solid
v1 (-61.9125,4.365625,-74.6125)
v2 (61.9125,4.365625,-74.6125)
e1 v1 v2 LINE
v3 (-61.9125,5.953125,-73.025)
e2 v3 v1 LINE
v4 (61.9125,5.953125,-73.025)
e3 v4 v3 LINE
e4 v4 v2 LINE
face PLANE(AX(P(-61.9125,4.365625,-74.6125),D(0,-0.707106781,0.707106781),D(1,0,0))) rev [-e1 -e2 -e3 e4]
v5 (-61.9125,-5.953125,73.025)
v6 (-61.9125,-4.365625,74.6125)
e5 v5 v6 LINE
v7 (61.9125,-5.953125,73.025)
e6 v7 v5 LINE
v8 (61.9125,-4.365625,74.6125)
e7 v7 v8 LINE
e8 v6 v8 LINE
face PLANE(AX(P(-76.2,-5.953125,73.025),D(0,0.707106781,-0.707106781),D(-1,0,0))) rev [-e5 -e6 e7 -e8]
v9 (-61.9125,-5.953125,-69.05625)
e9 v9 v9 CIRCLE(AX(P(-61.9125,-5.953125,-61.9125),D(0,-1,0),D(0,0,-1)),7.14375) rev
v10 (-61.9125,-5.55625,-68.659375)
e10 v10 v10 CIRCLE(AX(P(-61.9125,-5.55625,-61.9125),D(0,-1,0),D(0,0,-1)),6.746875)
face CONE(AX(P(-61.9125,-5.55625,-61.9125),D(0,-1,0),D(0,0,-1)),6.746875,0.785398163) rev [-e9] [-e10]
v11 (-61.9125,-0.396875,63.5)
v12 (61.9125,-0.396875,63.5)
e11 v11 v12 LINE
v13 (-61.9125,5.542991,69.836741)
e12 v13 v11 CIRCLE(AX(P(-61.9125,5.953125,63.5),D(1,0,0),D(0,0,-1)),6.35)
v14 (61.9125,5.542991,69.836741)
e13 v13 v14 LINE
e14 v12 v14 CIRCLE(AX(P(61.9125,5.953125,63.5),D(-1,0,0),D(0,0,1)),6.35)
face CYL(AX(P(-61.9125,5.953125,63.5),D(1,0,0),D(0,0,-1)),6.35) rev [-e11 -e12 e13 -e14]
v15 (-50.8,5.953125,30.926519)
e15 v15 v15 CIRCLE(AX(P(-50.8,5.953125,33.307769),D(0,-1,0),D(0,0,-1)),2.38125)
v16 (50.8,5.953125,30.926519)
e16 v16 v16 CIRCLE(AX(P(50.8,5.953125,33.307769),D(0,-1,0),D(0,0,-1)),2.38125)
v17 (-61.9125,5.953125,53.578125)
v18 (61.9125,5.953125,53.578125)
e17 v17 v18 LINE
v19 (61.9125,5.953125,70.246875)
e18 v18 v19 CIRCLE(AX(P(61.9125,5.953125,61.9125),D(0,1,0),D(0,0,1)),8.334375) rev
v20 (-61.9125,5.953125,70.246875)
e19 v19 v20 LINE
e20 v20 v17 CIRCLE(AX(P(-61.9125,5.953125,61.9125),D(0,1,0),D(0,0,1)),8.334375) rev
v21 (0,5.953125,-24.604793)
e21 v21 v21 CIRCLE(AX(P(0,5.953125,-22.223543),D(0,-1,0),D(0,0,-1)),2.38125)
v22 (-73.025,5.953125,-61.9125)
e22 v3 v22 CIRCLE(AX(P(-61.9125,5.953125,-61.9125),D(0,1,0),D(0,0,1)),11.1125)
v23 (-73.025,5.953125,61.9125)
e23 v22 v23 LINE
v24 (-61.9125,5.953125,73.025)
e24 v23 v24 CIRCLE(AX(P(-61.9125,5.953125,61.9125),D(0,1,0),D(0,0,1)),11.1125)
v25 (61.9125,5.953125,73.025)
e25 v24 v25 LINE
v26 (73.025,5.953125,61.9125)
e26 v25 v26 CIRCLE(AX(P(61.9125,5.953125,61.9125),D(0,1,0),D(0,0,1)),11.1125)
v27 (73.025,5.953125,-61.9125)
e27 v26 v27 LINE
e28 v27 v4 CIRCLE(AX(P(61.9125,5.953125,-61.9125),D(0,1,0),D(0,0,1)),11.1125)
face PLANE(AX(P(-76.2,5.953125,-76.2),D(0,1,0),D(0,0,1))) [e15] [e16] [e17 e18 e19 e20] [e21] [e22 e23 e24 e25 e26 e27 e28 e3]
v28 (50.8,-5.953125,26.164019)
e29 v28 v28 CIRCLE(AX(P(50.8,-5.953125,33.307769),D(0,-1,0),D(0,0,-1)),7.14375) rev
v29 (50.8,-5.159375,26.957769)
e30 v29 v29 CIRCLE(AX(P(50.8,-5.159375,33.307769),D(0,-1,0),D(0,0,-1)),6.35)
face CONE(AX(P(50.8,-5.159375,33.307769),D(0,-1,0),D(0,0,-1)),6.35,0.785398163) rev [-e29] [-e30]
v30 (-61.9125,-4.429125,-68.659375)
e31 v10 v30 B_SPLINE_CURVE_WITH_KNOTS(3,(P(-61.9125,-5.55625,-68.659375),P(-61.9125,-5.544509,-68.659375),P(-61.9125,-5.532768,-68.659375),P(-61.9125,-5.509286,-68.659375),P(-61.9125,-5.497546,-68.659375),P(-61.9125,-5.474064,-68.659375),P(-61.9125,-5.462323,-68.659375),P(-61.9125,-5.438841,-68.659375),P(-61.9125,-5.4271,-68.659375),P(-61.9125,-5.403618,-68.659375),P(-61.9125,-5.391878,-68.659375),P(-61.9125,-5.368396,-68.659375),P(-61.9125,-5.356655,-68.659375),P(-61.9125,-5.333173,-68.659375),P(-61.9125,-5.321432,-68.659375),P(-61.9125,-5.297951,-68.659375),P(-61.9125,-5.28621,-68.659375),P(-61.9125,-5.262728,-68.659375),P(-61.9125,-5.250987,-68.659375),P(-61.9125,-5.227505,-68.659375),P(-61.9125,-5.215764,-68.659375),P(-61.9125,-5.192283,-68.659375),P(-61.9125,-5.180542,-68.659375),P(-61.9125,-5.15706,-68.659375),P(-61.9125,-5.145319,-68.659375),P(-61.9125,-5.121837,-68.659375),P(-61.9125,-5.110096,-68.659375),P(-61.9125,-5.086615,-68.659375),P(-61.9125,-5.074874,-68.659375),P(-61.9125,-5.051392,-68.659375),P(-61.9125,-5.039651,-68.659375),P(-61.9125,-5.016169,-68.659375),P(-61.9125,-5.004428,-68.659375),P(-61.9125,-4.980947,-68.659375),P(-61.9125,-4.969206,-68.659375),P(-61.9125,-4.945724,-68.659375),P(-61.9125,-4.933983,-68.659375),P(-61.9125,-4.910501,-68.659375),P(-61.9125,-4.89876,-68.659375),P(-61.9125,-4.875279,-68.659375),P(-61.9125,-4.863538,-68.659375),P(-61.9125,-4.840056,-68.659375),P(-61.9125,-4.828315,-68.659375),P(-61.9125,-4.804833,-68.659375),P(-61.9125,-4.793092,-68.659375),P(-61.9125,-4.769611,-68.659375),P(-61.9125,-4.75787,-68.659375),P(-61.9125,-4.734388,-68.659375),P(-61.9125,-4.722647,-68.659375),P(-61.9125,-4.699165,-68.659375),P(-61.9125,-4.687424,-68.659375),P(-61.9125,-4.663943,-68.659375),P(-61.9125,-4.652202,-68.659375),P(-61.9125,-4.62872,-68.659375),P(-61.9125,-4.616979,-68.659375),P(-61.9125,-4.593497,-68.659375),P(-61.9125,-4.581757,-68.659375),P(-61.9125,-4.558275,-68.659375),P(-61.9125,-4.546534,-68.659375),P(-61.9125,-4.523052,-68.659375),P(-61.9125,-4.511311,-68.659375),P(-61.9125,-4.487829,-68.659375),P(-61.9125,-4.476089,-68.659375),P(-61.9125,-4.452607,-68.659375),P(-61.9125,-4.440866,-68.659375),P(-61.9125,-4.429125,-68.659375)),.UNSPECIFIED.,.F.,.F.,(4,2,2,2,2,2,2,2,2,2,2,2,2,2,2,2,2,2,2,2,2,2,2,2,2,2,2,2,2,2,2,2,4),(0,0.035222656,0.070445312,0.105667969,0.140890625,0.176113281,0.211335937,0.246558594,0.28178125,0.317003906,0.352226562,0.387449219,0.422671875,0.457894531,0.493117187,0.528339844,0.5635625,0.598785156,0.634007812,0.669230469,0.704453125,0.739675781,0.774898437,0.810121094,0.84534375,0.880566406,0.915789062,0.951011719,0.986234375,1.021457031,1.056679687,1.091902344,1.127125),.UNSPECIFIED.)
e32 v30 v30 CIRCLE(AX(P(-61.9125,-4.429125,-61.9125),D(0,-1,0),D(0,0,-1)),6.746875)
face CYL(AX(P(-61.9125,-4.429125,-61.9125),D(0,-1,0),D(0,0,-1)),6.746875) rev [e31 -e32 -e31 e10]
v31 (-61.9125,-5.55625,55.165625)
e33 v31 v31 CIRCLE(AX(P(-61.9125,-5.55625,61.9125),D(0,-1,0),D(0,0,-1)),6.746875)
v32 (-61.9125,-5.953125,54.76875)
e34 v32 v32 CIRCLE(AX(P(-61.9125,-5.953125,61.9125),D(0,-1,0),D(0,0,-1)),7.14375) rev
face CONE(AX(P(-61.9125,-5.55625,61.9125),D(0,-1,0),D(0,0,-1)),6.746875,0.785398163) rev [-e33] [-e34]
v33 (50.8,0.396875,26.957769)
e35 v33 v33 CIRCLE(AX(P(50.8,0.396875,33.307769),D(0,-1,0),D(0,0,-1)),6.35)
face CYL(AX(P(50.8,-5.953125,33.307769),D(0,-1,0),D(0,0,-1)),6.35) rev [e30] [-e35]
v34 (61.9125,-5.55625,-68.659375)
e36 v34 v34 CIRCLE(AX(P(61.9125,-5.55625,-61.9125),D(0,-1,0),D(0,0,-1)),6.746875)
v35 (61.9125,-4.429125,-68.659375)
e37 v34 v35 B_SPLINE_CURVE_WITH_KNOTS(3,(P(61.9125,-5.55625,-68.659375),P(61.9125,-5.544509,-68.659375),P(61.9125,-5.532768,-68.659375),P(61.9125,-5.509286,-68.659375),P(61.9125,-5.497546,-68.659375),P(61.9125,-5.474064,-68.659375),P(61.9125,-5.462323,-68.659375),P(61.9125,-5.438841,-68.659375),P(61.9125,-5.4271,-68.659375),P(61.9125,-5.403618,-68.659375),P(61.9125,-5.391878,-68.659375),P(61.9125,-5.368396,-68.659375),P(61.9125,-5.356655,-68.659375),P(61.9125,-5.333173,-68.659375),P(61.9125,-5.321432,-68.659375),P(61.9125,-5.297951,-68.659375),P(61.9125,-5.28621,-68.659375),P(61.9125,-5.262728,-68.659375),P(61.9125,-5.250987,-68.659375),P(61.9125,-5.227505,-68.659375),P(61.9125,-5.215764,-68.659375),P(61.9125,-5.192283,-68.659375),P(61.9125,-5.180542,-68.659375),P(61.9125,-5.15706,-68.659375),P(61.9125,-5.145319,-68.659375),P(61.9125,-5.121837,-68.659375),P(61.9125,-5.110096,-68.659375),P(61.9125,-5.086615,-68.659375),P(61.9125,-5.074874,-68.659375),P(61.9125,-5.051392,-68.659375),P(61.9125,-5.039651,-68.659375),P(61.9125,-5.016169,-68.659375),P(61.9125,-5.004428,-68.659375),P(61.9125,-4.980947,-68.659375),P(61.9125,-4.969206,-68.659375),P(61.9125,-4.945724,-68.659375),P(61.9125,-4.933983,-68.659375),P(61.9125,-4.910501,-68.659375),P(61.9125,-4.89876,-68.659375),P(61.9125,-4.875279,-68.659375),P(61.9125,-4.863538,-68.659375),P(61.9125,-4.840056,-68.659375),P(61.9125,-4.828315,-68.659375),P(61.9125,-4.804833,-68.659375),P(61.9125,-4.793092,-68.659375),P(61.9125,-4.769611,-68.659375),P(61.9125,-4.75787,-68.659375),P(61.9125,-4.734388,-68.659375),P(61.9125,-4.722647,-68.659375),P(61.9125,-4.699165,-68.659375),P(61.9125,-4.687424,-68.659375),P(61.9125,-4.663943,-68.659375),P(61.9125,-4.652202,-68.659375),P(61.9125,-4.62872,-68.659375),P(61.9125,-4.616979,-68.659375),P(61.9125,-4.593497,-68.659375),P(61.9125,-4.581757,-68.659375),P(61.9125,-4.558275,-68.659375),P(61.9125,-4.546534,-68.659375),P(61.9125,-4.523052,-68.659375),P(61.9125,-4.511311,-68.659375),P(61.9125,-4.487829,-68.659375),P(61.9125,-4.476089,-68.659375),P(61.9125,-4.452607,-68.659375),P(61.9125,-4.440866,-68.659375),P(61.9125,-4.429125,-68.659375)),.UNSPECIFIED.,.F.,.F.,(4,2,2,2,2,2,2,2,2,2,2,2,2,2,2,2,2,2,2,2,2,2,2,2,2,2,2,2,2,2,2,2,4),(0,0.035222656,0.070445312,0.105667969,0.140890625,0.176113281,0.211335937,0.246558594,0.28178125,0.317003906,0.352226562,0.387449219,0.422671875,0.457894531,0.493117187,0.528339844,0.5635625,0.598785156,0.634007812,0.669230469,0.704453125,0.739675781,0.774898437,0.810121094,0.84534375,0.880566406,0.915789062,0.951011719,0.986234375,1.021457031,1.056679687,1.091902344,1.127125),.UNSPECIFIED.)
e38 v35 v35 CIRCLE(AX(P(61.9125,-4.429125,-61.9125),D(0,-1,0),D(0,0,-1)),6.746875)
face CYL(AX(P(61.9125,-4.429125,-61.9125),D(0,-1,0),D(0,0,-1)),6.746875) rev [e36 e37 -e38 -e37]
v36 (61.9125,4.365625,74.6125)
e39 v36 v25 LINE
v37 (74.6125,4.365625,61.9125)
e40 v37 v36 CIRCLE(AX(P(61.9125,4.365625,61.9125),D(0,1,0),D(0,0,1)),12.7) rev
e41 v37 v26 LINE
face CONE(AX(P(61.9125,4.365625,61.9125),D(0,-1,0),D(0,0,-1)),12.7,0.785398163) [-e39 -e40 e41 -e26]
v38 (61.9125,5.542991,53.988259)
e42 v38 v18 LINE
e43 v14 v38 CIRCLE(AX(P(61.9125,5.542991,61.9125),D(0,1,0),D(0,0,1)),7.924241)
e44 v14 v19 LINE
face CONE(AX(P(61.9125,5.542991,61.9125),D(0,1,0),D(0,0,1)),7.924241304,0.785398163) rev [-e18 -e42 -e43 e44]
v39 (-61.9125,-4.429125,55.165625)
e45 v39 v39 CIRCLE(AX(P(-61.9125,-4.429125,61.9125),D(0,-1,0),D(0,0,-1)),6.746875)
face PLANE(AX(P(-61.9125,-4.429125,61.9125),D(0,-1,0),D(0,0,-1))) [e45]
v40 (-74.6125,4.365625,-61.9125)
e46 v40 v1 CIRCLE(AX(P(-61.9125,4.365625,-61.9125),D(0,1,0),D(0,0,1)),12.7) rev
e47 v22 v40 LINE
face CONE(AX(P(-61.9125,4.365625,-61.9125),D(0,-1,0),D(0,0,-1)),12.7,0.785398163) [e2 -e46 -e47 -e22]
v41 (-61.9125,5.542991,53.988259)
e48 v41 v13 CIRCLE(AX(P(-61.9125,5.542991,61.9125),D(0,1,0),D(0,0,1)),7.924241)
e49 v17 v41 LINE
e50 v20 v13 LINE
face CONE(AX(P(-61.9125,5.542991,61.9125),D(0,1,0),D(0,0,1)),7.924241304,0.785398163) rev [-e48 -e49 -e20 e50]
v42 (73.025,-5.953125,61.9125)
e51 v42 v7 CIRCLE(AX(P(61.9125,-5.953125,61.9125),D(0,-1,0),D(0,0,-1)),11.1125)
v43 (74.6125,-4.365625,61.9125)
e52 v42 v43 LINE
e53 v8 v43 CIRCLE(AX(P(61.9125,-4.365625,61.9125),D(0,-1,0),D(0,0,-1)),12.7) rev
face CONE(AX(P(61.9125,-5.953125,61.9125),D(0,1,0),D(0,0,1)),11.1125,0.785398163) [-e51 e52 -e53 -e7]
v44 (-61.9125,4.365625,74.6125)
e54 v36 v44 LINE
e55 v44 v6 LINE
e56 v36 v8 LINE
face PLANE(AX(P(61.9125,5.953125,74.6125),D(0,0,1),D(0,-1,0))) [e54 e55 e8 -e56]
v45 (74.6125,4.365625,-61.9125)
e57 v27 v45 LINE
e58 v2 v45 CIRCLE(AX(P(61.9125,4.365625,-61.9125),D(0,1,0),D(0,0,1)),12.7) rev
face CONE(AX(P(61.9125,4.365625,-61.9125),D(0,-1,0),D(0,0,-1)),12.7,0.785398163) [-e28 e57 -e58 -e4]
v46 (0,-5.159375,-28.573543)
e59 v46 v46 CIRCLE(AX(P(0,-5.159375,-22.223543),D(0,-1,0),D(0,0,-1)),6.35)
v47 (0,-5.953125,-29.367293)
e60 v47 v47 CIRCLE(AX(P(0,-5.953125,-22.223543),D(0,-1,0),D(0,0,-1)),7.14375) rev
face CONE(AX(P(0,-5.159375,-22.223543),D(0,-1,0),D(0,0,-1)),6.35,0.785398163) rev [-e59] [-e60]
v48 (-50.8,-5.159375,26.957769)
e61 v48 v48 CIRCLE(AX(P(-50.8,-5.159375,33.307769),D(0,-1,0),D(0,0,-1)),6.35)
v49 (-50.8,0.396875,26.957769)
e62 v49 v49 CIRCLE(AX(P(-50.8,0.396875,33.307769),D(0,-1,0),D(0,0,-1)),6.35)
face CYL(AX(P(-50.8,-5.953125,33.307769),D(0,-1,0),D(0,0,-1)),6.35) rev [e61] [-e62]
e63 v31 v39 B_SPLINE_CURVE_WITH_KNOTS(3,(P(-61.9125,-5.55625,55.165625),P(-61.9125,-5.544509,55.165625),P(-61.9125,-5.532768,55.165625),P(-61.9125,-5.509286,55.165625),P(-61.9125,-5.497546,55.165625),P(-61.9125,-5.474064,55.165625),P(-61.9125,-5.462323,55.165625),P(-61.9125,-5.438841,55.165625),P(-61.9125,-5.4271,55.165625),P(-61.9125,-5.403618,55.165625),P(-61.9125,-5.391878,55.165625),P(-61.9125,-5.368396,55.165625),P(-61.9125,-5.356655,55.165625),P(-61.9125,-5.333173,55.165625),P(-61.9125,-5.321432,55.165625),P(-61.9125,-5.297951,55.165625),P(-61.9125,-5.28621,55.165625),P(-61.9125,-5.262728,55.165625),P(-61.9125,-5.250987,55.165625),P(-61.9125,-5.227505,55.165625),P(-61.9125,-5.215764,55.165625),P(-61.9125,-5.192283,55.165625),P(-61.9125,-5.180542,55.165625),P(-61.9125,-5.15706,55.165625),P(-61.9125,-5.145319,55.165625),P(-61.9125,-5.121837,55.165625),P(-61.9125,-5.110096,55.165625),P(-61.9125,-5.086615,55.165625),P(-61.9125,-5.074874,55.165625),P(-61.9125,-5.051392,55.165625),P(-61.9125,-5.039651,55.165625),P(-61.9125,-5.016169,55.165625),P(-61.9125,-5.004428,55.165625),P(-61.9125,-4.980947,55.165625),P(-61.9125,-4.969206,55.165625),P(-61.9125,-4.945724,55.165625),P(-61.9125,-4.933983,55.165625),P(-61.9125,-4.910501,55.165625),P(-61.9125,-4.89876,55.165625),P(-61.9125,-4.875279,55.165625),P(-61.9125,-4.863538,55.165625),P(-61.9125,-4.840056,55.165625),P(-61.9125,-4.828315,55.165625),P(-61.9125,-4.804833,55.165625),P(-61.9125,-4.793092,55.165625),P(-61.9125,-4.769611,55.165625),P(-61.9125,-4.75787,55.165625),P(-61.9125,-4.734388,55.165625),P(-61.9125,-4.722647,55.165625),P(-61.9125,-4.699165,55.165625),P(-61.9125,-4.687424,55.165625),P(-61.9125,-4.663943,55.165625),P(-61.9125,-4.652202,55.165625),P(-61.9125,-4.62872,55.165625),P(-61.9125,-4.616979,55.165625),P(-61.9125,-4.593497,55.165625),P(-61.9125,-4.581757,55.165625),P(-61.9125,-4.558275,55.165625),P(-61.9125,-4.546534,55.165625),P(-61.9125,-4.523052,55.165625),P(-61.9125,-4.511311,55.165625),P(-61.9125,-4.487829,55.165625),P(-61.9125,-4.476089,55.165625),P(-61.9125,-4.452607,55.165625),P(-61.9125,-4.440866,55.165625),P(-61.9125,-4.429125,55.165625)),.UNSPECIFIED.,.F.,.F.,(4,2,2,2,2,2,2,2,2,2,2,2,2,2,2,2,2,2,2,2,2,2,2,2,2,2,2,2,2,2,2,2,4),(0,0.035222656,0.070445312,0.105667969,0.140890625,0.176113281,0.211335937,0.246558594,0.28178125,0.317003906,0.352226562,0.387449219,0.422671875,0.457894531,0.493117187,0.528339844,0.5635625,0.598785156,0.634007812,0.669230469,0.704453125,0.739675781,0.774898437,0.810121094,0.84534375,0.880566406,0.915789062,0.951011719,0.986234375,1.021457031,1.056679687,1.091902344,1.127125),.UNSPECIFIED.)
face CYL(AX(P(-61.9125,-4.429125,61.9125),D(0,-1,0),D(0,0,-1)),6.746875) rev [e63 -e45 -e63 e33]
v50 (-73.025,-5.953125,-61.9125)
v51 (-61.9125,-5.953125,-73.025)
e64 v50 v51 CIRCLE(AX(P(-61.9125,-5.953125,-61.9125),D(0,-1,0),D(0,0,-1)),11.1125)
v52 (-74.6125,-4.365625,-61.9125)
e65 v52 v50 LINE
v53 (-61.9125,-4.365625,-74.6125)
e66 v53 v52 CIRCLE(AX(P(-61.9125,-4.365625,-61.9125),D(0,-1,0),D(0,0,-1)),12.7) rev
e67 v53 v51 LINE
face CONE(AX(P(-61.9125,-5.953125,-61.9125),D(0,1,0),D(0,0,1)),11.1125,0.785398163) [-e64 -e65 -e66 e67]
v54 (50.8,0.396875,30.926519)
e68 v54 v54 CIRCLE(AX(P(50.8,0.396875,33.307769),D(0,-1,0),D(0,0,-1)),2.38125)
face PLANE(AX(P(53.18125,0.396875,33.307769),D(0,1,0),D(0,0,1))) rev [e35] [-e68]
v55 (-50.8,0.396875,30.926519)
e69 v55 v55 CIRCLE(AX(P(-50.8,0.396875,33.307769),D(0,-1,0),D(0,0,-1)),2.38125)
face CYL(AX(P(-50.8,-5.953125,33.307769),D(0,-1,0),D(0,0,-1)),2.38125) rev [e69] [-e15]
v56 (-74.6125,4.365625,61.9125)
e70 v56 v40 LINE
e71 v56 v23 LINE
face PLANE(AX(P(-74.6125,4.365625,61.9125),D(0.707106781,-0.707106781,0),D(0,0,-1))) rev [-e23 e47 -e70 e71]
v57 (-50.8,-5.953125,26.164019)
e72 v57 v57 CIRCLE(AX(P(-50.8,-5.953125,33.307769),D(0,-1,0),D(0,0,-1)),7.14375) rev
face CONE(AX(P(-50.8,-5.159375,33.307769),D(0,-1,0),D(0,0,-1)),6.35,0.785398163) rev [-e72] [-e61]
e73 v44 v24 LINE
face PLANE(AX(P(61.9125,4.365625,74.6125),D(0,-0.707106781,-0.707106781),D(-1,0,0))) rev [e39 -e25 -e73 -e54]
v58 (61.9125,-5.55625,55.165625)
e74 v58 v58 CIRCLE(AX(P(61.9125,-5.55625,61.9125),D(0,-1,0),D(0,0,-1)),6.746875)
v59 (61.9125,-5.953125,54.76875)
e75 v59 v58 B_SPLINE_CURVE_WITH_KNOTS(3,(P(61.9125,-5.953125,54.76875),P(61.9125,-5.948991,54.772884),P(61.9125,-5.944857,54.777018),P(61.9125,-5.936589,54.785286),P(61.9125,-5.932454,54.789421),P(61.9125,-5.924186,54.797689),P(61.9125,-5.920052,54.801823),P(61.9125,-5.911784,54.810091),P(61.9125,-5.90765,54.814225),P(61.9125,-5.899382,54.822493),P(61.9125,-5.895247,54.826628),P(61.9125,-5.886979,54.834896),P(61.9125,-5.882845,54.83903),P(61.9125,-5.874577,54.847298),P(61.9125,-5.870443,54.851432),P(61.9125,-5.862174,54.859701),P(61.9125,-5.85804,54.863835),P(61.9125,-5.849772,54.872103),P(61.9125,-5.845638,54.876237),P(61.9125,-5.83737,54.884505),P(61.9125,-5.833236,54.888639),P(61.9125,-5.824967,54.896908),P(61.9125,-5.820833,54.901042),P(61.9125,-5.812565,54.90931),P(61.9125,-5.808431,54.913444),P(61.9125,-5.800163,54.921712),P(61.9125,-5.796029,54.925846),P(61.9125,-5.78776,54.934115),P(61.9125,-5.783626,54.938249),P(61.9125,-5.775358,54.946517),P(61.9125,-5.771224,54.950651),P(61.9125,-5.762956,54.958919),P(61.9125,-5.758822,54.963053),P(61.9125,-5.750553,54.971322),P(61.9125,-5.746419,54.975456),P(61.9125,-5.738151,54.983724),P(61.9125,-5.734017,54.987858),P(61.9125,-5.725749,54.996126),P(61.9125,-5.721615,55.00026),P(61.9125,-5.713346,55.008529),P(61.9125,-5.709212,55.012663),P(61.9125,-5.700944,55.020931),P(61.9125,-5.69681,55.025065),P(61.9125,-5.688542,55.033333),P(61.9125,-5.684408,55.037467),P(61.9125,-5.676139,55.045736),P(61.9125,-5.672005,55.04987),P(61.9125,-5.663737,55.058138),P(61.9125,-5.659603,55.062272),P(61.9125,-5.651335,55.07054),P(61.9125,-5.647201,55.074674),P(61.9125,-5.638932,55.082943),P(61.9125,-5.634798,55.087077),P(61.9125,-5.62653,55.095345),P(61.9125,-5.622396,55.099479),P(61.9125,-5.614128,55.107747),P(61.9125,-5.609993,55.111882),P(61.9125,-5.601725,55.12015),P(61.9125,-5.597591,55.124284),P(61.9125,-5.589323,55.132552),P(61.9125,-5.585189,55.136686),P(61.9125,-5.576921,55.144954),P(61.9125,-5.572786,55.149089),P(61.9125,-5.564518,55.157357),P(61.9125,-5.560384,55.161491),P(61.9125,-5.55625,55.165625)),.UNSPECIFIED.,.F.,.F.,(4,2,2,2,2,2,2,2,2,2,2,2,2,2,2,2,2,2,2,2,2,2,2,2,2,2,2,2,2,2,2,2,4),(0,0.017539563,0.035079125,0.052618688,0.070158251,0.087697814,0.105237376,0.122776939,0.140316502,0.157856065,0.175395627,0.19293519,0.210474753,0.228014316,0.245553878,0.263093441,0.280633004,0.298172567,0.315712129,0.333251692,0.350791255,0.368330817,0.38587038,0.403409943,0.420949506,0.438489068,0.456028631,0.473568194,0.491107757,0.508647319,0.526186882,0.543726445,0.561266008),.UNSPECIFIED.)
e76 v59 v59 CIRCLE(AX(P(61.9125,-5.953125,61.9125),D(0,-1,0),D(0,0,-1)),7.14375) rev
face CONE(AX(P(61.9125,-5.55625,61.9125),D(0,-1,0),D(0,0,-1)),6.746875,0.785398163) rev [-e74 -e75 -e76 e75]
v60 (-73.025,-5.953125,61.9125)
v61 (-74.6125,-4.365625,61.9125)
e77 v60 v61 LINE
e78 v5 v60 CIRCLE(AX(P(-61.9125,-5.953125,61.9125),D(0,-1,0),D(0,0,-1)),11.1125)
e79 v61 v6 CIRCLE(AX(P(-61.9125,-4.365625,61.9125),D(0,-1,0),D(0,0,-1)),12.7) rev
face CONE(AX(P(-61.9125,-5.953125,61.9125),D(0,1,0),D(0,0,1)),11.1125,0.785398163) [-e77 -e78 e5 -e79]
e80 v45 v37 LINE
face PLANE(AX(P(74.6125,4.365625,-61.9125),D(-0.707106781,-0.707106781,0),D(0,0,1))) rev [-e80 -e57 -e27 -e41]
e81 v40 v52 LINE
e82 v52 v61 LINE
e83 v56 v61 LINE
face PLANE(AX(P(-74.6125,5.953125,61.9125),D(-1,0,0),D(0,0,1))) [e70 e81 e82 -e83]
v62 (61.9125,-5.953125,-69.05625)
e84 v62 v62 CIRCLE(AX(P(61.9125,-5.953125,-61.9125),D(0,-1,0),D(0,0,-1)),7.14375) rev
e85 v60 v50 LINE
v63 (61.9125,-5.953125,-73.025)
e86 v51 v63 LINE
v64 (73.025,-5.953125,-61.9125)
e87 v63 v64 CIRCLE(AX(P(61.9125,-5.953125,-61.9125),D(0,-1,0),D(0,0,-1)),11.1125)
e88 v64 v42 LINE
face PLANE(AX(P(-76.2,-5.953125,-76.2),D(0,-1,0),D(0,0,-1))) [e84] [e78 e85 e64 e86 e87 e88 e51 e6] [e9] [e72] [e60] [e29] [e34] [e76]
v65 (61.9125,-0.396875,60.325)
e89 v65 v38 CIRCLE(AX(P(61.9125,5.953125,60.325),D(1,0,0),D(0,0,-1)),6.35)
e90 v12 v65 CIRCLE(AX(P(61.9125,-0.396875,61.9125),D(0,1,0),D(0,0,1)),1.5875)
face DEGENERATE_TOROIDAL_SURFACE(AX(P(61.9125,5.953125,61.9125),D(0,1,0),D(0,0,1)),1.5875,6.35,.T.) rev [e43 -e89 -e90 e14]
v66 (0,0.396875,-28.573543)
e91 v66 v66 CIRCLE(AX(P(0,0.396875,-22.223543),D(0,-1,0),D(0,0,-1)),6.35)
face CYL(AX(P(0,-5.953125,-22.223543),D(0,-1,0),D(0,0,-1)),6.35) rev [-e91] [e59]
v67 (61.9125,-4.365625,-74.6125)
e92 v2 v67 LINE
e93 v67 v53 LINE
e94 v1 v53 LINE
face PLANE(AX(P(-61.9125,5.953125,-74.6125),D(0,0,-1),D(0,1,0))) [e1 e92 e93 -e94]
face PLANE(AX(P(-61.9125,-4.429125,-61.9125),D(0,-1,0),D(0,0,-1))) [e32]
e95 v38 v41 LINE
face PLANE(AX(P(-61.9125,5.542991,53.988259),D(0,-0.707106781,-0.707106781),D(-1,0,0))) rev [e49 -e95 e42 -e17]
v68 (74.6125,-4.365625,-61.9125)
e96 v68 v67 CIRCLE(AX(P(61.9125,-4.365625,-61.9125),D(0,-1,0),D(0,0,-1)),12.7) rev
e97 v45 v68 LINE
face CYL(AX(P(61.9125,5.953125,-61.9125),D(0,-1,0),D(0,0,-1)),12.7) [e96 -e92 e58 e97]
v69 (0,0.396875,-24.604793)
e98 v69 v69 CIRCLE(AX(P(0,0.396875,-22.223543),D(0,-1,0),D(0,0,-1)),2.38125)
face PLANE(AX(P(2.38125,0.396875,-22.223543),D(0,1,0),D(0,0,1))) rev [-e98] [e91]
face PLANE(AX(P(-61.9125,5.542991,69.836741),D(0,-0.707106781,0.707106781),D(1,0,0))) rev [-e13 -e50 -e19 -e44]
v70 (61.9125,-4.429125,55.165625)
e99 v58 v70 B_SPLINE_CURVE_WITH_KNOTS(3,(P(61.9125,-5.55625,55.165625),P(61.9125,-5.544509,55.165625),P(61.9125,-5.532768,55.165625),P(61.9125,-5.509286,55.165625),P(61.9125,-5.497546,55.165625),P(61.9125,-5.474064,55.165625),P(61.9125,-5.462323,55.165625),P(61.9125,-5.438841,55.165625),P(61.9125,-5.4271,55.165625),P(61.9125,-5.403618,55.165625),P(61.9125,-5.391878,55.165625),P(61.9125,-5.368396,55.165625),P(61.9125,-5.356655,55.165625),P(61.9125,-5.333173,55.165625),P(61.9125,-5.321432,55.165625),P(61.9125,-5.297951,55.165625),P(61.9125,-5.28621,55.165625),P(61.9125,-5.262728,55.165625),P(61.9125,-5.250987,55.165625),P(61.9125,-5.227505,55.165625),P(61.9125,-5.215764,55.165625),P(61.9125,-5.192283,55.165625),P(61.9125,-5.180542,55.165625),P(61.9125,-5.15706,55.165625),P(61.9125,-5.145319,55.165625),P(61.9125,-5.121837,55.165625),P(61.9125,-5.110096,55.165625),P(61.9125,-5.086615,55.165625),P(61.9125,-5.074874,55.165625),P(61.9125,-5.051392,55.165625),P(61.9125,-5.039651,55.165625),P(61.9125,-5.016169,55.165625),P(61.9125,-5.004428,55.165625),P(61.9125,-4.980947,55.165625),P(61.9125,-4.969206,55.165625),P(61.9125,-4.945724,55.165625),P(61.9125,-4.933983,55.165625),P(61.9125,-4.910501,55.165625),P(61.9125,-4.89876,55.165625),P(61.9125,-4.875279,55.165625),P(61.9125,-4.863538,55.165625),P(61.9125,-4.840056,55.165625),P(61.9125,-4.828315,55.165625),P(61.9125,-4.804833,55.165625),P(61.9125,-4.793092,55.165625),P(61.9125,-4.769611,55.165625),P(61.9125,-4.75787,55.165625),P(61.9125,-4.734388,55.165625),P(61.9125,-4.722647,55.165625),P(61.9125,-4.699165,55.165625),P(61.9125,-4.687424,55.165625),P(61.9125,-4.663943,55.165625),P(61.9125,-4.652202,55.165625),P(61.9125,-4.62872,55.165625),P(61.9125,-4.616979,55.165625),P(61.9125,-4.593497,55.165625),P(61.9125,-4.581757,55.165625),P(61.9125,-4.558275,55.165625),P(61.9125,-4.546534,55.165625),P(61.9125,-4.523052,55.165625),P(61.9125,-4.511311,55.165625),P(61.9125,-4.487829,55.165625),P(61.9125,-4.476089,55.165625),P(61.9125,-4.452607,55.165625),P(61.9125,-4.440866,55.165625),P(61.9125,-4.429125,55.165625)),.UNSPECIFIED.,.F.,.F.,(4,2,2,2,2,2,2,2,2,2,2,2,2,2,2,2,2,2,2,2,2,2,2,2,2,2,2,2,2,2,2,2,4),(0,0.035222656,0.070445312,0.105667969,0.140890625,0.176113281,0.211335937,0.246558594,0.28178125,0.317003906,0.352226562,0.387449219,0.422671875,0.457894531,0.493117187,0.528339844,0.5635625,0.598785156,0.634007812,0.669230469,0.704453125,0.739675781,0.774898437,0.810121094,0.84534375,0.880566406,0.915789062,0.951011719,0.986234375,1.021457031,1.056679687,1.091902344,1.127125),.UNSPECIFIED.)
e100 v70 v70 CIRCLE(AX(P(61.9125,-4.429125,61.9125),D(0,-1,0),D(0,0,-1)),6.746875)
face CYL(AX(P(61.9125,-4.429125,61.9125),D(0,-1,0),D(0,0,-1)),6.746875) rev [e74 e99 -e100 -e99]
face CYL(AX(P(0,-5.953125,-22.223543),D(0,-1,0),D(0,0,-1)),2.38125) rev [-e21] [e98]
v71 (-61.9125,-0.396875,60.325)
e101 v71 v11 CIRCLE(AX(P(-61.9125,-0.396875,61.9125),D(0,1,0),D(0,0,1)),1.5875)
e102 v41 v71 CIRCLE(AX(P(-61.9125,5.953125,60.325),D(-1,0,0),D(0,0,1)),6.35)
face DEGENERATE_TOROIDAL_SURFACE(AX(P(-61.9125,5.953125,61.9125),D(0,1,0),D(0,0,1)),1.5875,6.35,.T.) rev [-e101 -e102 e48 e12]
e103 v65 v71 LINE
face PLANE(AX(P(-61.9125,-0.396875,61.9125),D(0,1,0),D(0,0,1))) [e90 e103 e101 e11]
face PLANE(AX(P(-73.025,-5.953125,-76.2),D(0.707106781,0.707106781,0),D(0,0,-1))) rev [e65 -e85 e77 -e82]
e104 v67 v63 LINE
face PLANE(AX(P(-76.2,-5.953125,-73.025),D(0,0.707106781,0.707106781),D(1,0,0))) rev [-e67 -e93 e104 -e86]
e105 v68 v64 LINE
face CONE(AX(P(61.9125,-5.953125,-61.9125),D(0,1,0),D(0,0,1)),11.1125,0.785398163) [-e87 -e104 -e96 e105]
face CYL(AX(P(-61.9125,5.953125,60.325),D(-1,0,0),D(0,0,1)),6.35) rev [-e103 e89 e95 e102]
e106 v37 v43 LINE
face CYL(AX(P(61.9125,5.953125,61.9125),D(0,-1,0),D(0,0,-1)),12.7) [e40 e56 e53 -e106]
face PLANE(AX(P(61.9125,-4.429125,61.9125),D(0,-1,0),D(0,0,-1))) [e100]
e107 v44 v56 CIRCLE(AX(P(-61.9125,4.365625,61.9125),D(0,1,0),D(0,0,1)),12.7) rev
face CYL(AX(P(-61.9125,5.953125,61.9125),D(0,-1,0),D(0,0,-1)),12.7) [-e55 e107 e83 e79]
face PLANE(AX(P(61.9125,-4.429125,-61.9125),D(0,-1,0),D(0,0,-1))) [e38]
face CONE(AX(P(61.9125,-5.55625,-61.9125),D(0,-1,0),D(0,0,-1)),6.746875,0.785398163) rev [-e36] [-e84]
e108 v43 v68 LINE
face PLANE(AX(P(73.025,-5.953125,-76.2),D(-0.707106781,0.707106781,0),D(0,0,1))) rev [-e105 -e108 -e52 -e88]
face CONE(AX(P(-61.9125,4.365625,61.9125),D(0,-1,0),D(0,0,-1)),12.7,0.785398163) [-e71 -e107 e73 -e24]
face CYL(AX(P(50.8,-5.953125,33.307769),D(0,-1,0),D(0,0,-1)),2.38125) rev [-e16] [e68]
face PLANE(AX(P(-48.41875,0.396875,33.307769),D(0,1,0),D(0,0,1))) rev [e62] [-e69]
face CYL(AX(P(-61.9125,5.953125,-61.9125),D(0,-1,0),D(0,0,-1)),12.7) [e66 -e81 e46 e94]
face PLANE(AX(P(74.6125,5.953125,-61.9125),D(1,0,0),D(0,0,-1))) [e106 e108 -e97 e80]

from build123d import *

# Parameters (mm, degrees)
BOSS_EXTRUDE1_DEPTH      = 76.2
BOSS_EXTRUDE1_DEPTH_BACK = 76.2
SKETCH3_W                = 152.4
SKETCH3_H                = 11.90625
SKETCH8_OUTSIDE_W        = 197.57
SKETCH8_OUTSIDE_H        = 197.57
CUT_EXTRUDE2_DEPTH       = 109.41881197
CHAMFER1_SIZE            = 1.5875
PEN_SLOT_CUT_DEPTH       = 6.35
PEN_SLOT_FILLET_R        = 6.35
HOLE1_D                  = 4.7625
HOLE1_CBORE_D            = 12.7
HOLE1_CBORE_DEPTH        = 6.35
SKETCH6_R                = 6.746875
CUT_EXTRUDE1_DEPTH       = 1.524
BASE_CHAMFERS_SIZE       = 0.79375


# Some blends are built 0.0001 mm under size
with BuildPart() as part:
    # Sketch3 → Boss-Extrude1 (new, two sides: drawn at the far end of the back side and taken through both)
    with BuildSketch(Plane(origin=(0, 0, 0), x_dir=(0, 0, -1), z_dir=(1, 0, 0)).offset(-BOSS_EXTRUDE1_DEPTH_BACK)):
        Rectangle(SKETCH3_W, SKETCH3_H)
    extrude(amount=BOSS_EXTRUDE1_DEPTH + BOSS_EXTRUDE1_DEPTH_BACK)

    # Sketch8 outside → Cut-Extrude2 (cut, through all)
    with BuildSketch(Plane.XZ.offset(5.953125)):
        Rectangle(SKETCH8_OUTSIDE_W, SKETCH8_OUTSIDE_H)
        with BuildLine():
            Line((-61.9125, -74.6125), (61.9125, -74.6125))
            ThreePointArc((61.9125, -74.6125), (70.892756121, -70.892756121), (74.6125, -61.9125))
            Line((74.6125, -61.9125), (74.6125, 61.9125))
            ThreePointArc((74.6125, 61.9125), (70.892756121, 70.892756121), (61.9125, 74.6125))
            Line((61.9125, 74.6125), (-61.9125, 74.6125))
            ThreePointArc((-61.9125, 74.6125), (-70.892756121, 70.892756121), (-74.6125, 61.9125))
            Line((-74.6125, 61.9125), (-74.6125, -61.9125))
            ThreePointArc((-74.6125, -61.9125), (-70.892756121, -70.892756121), (-61.9125, -74.6125))
        make_face(mode=Mode.SUBTRACT)
    extrude(amount=-CUT_EXTRUDE2_DEPTH, mode=Mode.SUBTRACT)

    # Chamfer1
    chamfer1_edges = [part.edges().sort_by_distance(p)[0] for p in [
        (-74.6125, 5.953125, 0),
        (-70.892756121, 5.953125, -70.892756121),
        (0, 5.953125, -74.6125),
        (70.892756121, 5.953125, -70.892756121),
        (74.6125, 5.953125, 0),
        (70.892756121, 5.953125, 70.892756121),
        (0, 5.953125, 74.6125),
        (-70.892756121, 5.953125, 70.892756121),
        (-70.892756121, -5.953125, -70.892756121),
        (-74.6125, -5.953125, 0),
        (-70.892756121, -5.953125, 70.892756121),
        (0, -5.953125, 74.6125),
        (70.892756121, -5.953125, 70.892756121),
        (74.6125, -5.953125, 0),
        (70.892756121, -5.953125, -70.892756121),
        (0, -5.953125, -74.6125),
    ]]
    chamfer(chamfer1_edges, length=CHAMFER1_SIZE)

    # Pen Slot Sketch → Pen Slot Cut (cut)
    with BuildSketch(Plane(origin=(0, 5.953125, 0), x_dir=(1, 0, 0), z_dir=(0, 1, 0))):
        with BuildLine():
            Line((-61.9125, -53.975), (61.9125, -53.975))
            ThreePointArc((61.9125, -53.975), (69.85, -61.9125), (61.9125, -69.85))
            Line((61.9125, -69.85), (-61.9125, -69.85))
            ThreePointArc((-61.9125, -69.85), (-69.85, -61.9125), (-61.9125, -53.975))
        make_face()
    extrude(amount=-PEN_SLOT_CUT_DEPTH, mode=Mode.SUBTRACT)

    # Pen Slot Fillet
    pen_slot_fillet_edges = [part.edges().sort_by_distance(p)[0] for p in [
        (0, -0.396875, 53.975),
        (69.85, -0.396875, 61.9125),
        (0, -0.396875, 69.85),
        (-69.85, -0.396875, 61.9125),
    ]]
    fillet(pen_slot_fillet_edges, radius=PEN_SLOT_FILLET_R - 0.0001)  # a hair under: the kernel refuses the full size

    # Hole1 (through all)
    with Locations(Plane(origin=(-50.8, -5.953125, 33.30776944), x_dir=(0, 0, -1), z_dir=(0, -1, 0))):
        with Locations((0, 0), (0, 101.6), (55.531312028, 50.8)):
            CounterBoreHole(HOLE1_D / 2, HOLE1_CBORE_D / 2, HOLE1_CBORE_DEPTH)

    # Sketch6 → Cut-Extrude1 (cut)
    with BuildSketch(Plane(origin=(0, -5.953125, 0), x_dir=(-1, 0, 0), z_dir=(0, -1, 0))):
        with Locations(Location((-61.9125, 61.9125, 0), (0, 0, 90))):
            Circle(SKETCH6_R)
        with Locations(Location((61.9125, 61.9125, 0), (0, 0, 90))):
            Circle(SKETCH6_R)
        with Locations(Location((61.9125, -61.9125, 0), (0, 0, 90))):
            Circle(SKETCH6_R)
        with Locations(Location((-61.9125, -61.9125, 0), (0, 0, 90))):
            Circle(SKETCH6_R)
    extrude(amount=-CUT_EXTRUDE1_DEPTH, mode=Mode.SUBTRACT)

    # Chamfer2
    # the kernel refuses this chamfer: 0.396875 mm, written as the material it takes off along each edge
    with BuildSketch(Plane(origin=(-61.9125, 5.953125, 61.9125), x_dir=(0, 0, 1), z_dir=(1, 0, 0))) as chamfer2_piece_1:
        with BuildLine():
            Line((7.853310099, 0.481064901), (8.418564901, -0.084189901))
            Line((8.418564901, -0.084189901), (8.418564901, -0.143721151))
            ThreePointArc((8.418564901, -0.143721151), (8.178032451, -0.05953125), (7.9375, -0.05953125))
            Line((7.9375, -0.05953125), (7.87796875, 0))
            ThreePointArc((7.87796875, 0), (7.87796875, 0.240532451), (7.793778849, 0.481064901))
            Line((7.793778849, 0.481064901), (7.853310099, 0.481064901))
        make_face()
    revolve(axis=Axis((-61.9125, 5.953125, 61.9125), (0, -1, 0)), revolution_arc=180, mode=Mode.SUBTRACT)
    with BuildSketch(Plane(origin=(61.9125, 5.953125, 69.85), x_dir=(0, 0.17238737169530088, 0.9850292351397425), z_dir=(-1, 0, 0))) as chamfer2_piece_2:
        with BuildLine():
            Line((0.488376267, 0), (-0.165859028, -0.459349716))
            Line((-0.165859028, -0.459349716), (-0.224499049, -0.44908728))
            ThreePointArc((-0.224499049, -0.44908728), (-0.100104779, -0.22666906), (-0.058640022, 0.010262436))
            Line((-0.058640022, 0.010262436), (0.010262436, 0.058640022))
            ThreePointArc((0.010262436, 0.058640022), (0.247193932, 0.017175265), (0.498638703, 0.058640022))
            Line((0.498638703, 0.058640022), (0.488376267, 0))
        make_face()
    extrude(amount=123.825, mode=Mode.SUBTRACT)
    with BuildSketch(Plane(origin=(61.9125, 5.953125, 61.9125), x_dir=(0, 0, -1), z_dir=(-1, 0, 0))) as chamfer2_piece_3:
        with BuildLine():
            Line((8.418564901, -0.084189901), (7.853310099, 0.481064901))
            Line((7.853310099, 0.481064901), (7.793778849, 0.481064901))
            ThreePointArc((7.793778849, 0.481064901), (7.87796875, 0.240532451), (7.87796875, 0))
            Line((7.87796875, 0), (7.9375, -0.05953125))
            ThreePointArc((7.9375, -0.05953125), (8.178032451, -0.05953125), (8.418564901, -0.143721151))
            Line((8.418564901, -0.143721151), (8.418564901, -0.084189901))
        make_face()
    revolve(axis=Axis((61.9125, 5.953125, 61.9125), (0, -1, 0)), revolution_arc=180, mode=Mode.SUBTRACT)
    with BuildSketch(Plane(origin=(-61.9125, 5.953125, 53.975), x_dir=(0, -0.9850292351397427, 0.17238737169529986), z_dir=(1, 0, 0))) as chamfer2_piece_4:
        with BuildLine():
            Line((0.488376267, 0), (-0.165859028, 0.459349716))
            Line((-0.165859028, 0.459349716), (-0.224499049, 0.44908728))
            ThreePointArc((-0.224499049, 0.44908728), (-0.100104779, 0.22666906), (-0.058640022, -0.010262436))
            Line((-0.058640022, -0.010262436), (0.010262436, -0.058640022))
            ThreePointArc((0.010262436, -0.058640022), (0.247193932, -0.017175265), (0.498638703, -0.058640022))
            Line((0.498638703, -0.058640022), (0.488376267, 0))
        make_face()
    extrude(amount=123.825, mode=Mode.SUBTRACT)
    with BuildSketch(Plane(origin=(61.9125, -5.953125, 61.9125), x_dir=(0, 0, -1), z_dir=(-1, 0, 0))) as chamfer2_piece_5:
        with BuildLine():
            Line((7.227939901, 0.084189901), (6.662685099, -0.481064901))
            Line((6.662685099, -0.481064901), (6.603153849, -0.481064901))
            ThreePointArc((6.603153849, -0.481064901), (6.68734375, -0.240532451), (6.68734375, 0))
            Line((6.68734375, 0), (6.746875, 0.05953125))
            ThreePointArc((6.746875, 0.05953125), (6.987407451, 0.05953125), (7.227939901, 0.143721151))
            Line((7.227939901, 0.143721151), (7.227939901, 0.084189901))
        make_face()
    revolve(axis=Axis((61.9125, -5.953125, 61.9125), (0, -1, 0)), mode=Mode.SUBTRACT)
    with BuildSketch(Plane(origin=(-61.9125, -5.953125, 61.9125), x_dir=(0, 0, -1), z_dir=(-1, 0, 0))) as chamfer2_piece_6:
        with BuildLine():
            Line((7.227939901, 0.084189901), (6.662685099, -0.481064901))
            Line((6.662685099, -0.481064901), (6.603153849, -0.481064901))
            ThreePointArc((6.603153849, -0.481064901), (6.68734375, -0.240532451), (6.68734375, 0))
            Line((6.68734375, 0), (6.746875, 0.05953125))
            ThreePointArc((6.746875, 0.05953125), (6.987407451, 0.05953125), (7.227939901, 0.143721151))
            Line((7.227939901, 0.143721151), (7.227939901, 0.084189901))
        make_face()
    revolve(axis=Axis((-61.9125, -5.953125, 61.9125), (0, -1, 0)), mode=Mode.SUBTRACT)
    with BuildSketch(Plane(origin=(-61.9125, -5.953125, -61.9125), x_dir=(0, 0, -1), z_dir=(-1, 0, 0))) as chamfer2_piece_7:
        with BuildLine():
            Line((7.227939901, 0.084189901), (6.662685099, -0.481064901))
            Line((6.662685099, -0.481064901), (6.603153849, -0.481064901))
            ThreePointArc((6.603153849, -0.481064901), (6.68734375, -0.240532451), (6.68734375, 0))
            Line((6.68734375, 0), (6.746875, 0.05953125))
            ThreePointArc((6.746875, 0.05953125), (6.987407451, 0.05953125), (7.227939901, 0.143721151))
            Line((7.227939901, 0.143721151), (7.227939901, 0.084189901))
        make_face()
    revolve(axis=Axis((-61.9125, -5.953125, -61.9125), (0, -1, 0)), mode=Mode.SUBTRACT)
    with BuildSketch(Plane(origin=(61.9125, -5.953125, -61.9125), x_dir=(0, 0, -1), z_dir=(-1, 0, 0))) as chamfer2_piece_8:
        with BuildLine():
            Line((7.227939901, 0.084189901), (6.662685099, -0.481064901))
            Line((6.662685099, -0.481064901), (6.603153849, -0.481064901))
            ThreePointArc((6.603153849, -0.481064901), (6.68734375, -0.240532451), (6.68734375, 0))
            Line((6.68734375, 0), (6.746875, 0.05953125))
            ThreePointArc((6.746875, 0.05953125), (6.987407451, 0.05953125), (7.227939901, 0.143721151))
            Line((7.227939901, 0.143721151), (7.227939901, 0.084189901))
        make_face()
    revolve(axis=Axis((61.9125, -5.953125, -61.9125), (0, -1, 0)), mode=Mode.SUBTRACT)

    # Base Chamfers
    base_chamfers_edges = [part.edges().sort_by_distance(p)[0] for p in [
        (0, -5.953125, -15.873542588),
        (50.8, -5.953125, 39.65776944),
        (-50.8, -5.953125, 39.65776944),
    ]]
    chamfer(base_chamfers_edges, length=BASE_CHAMFERS_SIZE)


solid = part.part
